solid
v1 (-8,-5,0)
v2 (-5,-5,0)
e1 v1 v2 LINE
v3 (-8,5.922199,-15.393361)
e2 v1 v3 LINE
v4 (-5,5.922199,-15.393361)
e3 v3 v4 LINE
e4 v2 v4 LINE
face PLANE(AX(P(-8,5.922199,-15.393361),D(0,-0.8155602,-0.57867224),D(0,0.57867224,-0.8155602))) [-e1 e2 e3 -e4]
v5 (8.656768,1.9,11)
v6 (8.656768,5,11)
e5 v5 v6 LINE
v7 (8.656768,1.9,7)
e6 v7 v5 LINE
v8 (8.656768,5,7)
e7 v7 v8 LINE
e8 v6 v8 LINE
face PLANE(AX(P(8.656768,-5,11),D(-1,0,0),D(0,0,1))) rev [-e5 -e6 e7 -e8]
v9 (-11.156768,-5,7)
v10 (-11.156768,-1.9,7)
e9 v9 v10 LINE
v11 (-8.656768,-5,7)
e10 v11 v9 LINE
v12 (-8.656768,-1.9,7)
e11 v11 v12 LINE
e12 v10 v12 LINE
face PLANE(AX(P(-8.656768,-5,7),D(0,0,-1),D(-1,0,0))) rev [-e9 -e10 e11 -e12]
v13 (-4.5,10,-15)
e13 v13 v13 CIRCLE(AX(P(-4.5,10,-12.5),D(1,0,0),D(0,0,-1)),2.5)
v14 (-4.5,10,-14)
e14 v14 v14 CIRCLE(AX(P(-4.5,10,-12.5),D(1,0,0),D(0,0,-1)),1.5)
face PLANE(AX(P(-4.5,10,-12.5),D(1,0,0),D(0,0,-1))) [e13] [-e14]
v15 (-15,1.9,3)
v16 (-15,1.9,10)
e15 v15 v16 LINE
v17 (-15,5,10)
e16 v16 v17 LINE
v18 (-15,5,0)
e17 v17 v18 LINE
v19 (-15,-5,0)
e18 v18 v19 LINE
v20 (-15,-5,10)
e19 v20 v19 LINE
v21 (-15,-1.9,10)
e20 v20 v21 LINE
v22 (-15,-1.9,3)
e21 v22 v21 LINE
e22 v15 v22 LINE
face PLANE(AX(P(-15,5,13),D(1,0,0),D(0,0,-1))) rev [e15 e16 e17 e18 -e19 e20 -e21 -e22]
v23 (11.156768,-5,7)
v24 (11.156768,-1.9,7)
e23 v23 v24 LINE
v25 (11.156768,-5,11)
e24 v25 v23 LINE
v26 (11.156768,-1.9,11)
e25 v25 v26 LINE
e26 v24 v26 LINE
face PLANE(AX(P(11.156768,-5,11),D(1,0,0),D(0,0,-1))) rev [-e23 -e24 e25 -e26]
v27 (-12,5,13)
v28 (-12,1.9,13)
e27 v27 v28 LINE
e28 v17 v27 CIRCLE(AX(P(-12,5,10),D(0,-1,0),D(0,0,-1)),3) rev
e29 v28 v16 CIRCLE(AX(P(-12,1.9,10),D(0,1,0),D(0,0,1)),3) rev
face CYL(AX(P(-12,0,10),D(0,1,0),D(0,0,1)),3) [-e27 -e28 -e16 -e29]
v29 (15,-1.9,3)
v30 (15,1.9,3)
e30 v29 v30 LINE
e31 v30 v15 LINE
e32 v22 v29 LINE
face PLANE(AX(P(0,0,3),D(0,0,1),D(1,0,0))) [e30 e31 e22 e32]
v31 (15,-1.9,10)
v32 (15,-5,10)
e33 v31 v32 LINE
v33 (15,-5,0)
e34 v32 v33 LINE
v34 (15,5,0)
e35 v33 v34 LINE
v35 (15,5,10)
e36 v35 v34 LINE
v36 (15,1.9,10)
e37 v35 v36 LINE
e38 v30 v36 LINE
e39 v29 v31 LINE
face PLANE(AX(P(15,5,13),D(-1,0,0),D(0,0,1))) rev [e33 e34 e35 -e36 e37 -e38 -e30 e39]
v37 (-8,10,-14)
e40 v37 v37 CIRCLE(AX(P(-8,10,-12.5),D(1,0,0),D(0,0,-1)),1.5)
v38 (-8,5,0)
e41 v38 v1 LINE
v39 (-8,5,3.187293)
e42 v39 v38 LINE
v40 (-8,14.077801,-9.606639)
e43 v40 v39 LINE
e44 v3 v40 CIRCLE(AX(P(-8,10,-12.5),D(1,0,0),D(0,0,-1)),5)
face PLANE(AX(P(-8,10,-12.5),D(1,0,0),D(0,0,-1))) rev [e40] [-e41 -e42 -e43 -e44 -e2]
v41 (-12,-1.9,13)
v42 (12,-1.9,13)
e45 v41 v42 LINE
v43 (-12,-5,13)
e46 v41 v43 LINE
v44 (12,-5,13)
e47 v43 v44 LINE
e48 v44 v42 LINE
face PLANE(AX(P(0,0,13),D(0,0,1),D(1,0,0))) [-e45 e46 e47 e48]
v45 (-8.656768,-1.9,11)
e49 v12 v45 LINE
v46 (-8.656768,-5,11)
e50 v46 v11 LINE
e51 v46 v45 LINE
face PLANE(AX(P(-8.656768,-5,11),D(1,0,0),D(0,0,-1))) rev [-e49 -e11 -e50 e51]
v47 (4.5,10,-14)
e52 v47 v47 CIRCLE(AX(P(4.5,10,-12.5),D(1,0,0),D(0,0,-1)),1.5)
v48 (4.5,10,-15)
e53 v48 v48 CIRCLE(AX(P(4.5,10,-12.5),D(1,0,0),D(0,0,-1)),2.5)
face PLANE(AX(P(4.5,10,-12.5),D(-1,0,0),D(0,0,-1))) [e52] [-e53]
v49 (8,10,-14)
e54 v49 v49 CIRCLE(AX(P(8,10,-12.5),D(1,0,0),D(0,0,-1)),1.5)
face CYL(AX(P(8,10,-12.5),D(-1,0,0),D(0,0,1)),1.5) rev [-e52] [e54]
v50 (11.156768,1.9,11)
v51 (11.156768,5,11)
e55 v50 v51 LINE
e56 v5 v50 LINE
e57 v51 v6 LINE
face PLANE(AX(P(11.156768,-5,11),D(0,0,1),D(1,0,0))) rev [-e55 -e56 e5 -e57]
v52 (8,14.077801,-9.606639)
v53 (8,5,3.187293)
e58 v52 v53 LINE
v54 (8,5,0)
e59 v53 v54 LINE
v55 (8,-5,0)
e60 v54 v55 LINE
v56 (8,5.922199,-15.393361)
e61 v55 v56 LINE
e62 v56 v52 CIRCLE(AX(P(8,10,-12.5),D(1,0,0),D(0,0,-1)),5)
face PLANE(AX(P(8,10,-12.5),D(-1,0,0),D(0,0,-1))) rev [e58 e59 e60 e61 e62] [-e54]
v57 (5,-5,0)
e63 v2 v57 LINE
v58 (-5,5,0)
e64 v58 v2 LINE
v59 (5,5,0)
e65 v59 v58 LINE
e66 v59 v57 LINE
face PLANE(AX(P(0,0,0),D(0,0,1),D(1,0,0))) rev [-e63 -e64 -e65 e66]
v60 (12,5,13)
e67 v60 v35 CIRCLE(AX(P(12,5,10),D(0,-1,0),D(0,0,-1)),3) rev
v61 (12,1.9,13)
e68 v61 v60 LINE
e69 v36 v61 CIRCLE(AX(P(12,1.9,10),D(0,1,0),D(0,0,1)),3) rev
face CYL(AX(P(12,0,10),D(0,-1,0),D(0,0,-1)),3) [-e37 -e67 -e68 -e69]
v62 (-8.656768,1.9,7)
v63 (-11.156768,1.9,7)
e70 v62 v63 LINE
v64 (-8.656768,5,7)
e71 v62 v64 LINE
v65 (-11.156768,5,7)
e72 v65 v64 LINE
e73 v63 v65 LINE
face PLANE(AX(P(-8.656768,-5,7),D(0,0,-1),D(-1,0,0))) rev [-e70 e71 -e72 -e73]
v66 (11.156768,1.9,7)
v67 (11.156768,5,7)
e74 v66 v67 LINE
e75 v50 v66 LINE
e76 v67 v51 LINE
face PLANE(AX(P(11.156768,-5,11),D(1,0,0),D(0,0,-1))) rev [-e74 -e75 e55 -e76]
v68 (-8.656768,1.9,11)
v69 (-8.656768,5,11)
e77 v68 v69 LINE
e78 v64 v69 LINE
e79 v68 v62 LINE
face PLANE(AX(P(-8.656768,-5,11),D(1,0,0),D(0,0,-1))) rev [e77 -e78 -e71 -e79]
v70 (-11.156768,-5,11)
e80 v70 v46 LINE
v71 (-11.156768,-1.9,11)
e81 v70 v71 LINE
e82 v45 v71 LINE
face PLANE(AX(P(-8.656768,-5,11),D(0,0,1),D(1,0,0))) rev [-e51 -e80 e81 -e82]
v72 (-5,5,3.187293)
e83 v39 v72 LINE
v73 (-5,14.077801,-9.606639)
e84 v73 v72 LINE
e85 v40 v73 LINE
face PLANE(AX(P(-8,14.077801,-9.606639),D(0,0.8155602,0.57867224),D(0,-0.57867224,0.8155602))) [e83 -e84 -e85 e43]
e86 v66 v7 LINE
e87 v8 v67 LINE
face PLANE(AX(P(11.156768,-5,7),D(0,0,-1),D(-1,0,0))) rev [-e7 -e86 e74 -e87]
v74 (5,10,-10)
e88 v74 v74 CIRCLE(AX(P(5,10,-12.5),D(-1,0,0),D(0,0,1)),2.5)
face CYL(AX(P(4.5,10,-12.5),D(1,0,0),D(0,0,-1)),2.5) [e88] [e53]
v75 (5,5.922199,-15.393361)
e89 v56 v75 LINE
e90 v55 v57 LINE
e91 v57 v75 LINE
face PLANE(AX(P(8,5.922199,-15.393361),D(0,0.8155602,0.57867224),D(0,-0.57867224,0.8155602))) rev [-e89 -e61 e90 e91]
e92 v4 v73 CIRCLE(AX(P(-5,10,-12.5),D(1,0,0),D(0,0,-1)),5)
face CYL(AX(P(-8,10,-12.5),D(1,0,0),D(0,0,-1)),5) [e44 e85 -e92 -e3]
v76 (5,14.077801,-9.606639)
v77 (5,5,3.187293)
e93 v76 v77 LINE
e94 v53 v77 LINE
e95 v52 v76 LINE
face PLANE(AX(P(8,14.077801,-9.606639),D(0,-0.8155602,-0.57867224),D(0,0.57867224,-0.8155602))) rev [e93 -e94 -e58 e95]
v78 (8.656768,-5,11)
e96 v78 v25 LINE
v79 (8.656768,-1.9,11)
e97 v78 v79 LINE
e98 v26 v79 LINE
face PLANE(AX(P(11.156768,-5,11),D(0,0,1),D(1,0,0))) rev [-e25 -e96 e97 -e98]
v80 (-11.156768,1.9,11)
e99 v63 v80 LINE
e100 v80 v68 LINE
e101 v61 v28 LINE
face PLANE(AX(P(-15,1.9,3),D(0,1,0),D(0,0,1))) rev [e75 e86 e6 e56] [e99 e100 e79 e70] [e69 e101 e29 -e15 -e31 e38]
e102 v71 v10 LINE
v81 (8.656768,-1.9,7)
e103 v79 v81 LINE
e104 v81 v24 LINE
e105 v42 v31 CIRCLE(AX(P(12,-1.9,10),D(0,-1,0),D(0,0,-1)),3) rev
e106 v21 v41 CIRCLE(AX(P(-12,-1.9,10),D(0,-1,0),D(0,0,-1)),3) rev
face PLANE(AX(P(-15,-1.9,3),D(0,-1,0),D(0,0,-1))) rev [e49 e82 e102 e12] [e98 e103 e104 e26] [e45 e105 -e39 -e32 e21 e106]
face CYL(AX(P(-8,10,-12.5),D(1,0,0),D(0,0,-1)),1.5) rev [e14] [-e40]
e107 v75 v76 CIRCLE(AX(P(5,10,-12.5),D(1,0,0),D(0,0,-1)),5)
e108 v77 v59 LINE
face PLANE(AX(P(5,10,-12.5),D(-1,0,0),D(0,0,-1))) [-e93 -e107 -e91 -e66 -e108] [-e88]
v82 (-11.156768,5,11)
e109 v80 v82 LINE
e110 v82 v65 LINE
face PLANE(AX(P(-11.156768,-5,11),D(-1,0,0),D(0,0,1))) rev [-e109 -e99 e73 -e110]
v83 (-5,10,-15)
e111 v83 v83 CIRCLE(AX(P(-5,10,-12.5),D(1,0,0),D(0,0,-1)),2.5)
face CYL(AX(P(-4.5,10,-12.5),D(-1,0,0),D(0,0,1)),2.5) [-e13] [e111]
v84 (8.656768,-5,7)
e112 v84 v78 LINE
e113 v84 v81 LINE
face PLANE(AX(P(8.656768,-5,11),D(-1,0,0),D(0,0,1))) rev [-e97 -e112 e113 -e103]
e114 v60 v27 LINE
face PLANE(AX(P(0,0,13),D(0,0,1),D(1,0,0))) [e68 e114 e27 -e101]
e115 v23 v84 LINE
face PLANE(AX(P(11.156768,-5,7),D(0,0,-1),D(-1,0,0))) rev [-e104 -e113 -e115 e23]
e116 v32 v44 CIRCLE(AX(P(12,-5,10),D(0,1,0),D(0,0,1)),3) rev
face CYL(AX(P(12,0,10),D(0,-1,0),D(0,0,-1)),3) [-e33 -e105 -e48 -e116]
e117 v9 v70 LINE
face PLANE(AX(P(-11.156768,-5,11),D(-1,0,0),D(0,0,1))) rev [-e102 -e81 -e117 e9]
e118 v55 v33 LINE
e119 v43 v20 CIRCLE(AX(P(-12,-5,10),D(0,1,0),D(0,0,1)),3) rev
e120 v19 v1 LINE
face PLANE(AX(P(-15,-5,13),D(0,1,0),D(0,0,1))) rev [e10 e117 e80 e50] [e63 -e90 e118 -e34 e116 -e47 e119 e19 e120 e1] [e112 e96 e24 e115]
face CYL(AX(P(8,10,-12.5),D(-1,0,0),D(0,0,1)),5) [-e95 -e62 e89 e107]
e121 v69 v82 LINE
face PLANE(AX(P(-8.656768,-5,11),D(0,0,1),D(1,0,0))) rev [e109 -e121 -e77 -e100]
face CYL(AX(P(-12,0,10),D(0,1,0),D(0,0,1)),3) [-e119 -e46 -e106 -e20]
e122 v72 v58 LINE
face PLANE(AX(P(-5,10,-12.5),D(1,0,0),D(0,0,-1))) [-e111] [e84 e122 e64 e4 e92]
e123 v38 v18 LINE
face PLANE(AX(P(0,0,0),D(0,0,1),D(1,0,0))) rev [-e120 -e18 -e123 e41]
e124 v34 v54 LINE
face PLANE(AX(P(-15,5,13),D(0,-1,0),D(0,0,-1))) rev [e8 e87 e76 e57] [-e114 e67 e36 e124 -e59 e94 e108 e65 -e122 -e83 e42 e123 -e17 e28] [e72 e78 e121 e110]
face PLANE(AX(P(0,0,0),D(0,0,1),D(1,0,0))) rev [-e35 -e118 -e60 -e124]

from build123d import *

# Parameters (mm, degrees)
ESBO_O1_W                  = 30
ESBO_O1_H                  = 10
RESSALTO_EXTRUS_O1_DEPTH   = 13
ESBO_O2_W                  = 30
ESBO_O2_H                  = 3.8
CORTE_EXTRUS_O1_DEPTH      = 10
FILETE1_R                  = 3
CORTE_EXTRUS_O2_DEPTH      = 23.226110771
CORTE_EXTRUS_O2_DEPTH_BACK = 23.226110771
ESBO_O3_W                  = 2.5
ESBO_O3_H                  = 4
ESBO_O4_W                  = 25
ESBO_O4_H                  = 25
RESSALTO_EXTRUS_O2_DEPTH   = 1.5
CHANFRO1_SIZE              = 5
CHANFRO1_SIZE_2            = 8.660254038
CHANFRO2_SIZE              = 7
CHANFRO2_SIZE2             = 4.041451884
ESBO_O5_R                  = 8.5
ESBO_O5_R_2                = 1
CORTE_EXTRUS_O3_DEPTH      = 3
FILETE2_R                  = 4
ESBO_O6_R                  = 1.5
RESSALTO_EXTRUS_O3_DEPTH   = 3
RESSALTO_EXTRUS_O4_START   = 0.5
ESBO_O7_R                  = 2.5
ESBO_O7_R_2                = 1.5
RESSALTO_EXTRUS_O4_DEPTH   = 0.5
CORTE_EXTRUS_O4_DEPTH      = 5


with BuildPart() as part:
    # Esboço1 → Ressalto-extrusão1 (new body)
    with BuildSketch(Plane.XY):
        Rectangle(ESBO_O1_W, ESBO_O1_H)
    extrude(amount=RESSALTO_EXTRUS_O1_DEPTH)

    # Esboço2 → Corte-extrusão1 (cut)
    with BuildSketch(Plane.XY.offset(13)):
        Rectangle(ESBO_O2_W, ESBO_O2_H)
    extrude(amount=-CORTE_EXTRUS_O1_DEPTH, mode=Mode.SUBTRACT)

    # Filete1
    filete1_edges = [part.edges().sort_by_distance(p)[0] for p in [
        (-15, 3.45, 13),
        (15, 3.45, 13),
        (-15, -3.45, 13),
        (15, -3.45, 13),
    ]]
    fillet(filete1_edges, radius=FILETE1_R)

    # Esboço3 → Corte-extrusão2 (cut, two sides: drawn at the far end of the back side and taken through both)
    with BuildSketch(Plane(origin=(0, 5, 0), x_dir=(1, 0, 0), z_dir=(0, 1, 0)).offset(-CORTE_EXTRUS_O2_DEPTH_BACK)):
        with Locations((9.906768391, -9)):
            Rectangle(ESBO_O3_W, ESBO_O3_H)
        with Locations((-9.906768391, -9)):
            Rectangle(ESBO_O3_W, ESBO_O3_H)
    extrude(amount=CORTE_EXTRUS_O2_DEPTH + CORTE_EXTRUS_O2_DEPTH_BACK, mode=Mode.SUBTRACT)

    # Esboço4 → Ressalto-extrusão2 (add, symmetric)
    with BuildSketch(Plane(origin=(13, 0, 0), x_dir=(0, 0, -1), z_dir=(1, 0, 0))):
        with Locations((12.5, 8.5)):
            Rectangle(ESBO_O4_W, ESBO_O4_H)
    extrude(amount=RESSALTO_EXTRUS_O2_DEPTH, both=True)

    # Chanfro1
    # the kernel refuses this chamfer: 8.660254038, 5 mm, written as the material it adds along each edge
    with BuildSketch(Plane(origin=(11.5, -4, 0), x_dir=(0, -0.9983227437537924, 0.05789386240267202), z_dir=(1, 0, 0))) as chanfro1_piece_1_section:
        Polygon((CHANFRO1_SIZE * 0.998322743754, CHANFRO1_SIZE * 0.0578938624027), (-CHANFRO1_SIZE_2 * 0.0578938624016, CHANFRO1_SIZE_2 * 0.998322743736), (0, 0), align=None)
    chanfro1_piece_1 = extrude(amount=3, mode=Mode.PRIVATE)
    chanfro1_piece_1 = split(chanfro1_piece_1, bisect_by=Plane(origin=(13, -5, -4.055902091), z_dir=(0, 1, 0)), keep=Keep.TOP, mode=Mode.PRIVATE)
    add(chanfro1_piece_1)

    # Chanfro2
    chanfro2_edges = [part.edges().sort_by_distance(p)[0] for p in [
        (13, 5, 0),
    ]]
    chanfro2_side = [part.faces().sort_by_distance(p)[0] for p in [
        (0, 5, 6.301932384),
    ]]
    chamfer(chanfro2_edges, length=CHANFRO2_SIZE, length2=CHANFRO2_SIZE2, reference=chanfro2_side[0])

    # Esboço5 → Corte-extrusão3 (cut)
    with BuildSketch(Plane.ZY.offset(-11.5)):
        with Locations((-12.5, 10)):
            Circle(ESBO_O5_R)
        with Locations((-20.2, 17.7)):
            Circle(ESBO_O5_R_2)
        with Locations((-4.8, 17.7)):
            Circle(ESBO_O5_R_2)
        with Locations((-4.8, 2.3)):
            Circle(ESBO_O5_R_2)
        with Locations((-20.2, 2.3)):
            Circle(ESBO_O5_R_2)
    extrude(amount=-CORTE_EXTRUS_O3_DEPTH, mode=Mode.SUBTRACT)

    # Filete2
    filete2_edges = [part.edges().sort_by_distance(p)[0] for p in [
        (13, 21, 0),
        (13, 21, -25),
        (13, -4, -25),
    ]]
    fillet(filete2_edges, radius=FILETE2_R)

    # Esboço6 → Ressalto-extrusão3 (add)
    with BuildSketch(Plane(origin=(-5, 0, 0), x_dir=(0, 0, -1), z_dir=(1, 0, 0))):
        with BuildLine():
            Line((9.606638802, 14.077800998), (-3.187293044, 5))
            Line((-3.187293044, 5), (0, 5))
            Line((0, 5), (0, -5))
            Line((0, -5), (15.393361198, 5.922199002))
            ThreePointArc((15.393361198, 5.922199002), (16.577800998, 12.893361198), (9.606638802, 14.077800998))
        make_face()
        with Locations((12.5, 10)):
            Circle(ESBO_O6_R, mode=Mode.SUBTRACT)
    ressalto_extrus_o3 = extrude(amount=-RESSALTO_EXTRUS_O3_DEPTH)

    # Esboço7 → Ressalto-extrusão4 (add)
    with BuildSketch(Plane(origin=(-5, 0, 0), x_dir=(0, 0, -1), z_dir=(1, 0, 0)).offset(RESSALTO_EXTRUS_O4_START)):
        with Locations((12.5, 10)):
            Circle(ESBO_O7_R)
        with Locations((12.5, 10)):
            Circle(ESBO_O7_R_2, mode=Mode.SUBTRACT)
    ressalto_extrus_o4 = extrude(amount=-RESSALTO_EXTRUS_O4_DEPTH)

    # Espelhar1: Ressalto-extrusão3, Ressalto-extrusão4 across plane
    add(ressalto_extrus_o3.mirror(Plane(origin=(0, 0, 0), x_dir=(0, 0, 1), z_dir=(1, 0, 0))))
    add(ressalto_extrus_o4.mirror(Plane(origin=(0, 0, 0), x_dir=(0, 0, 1), z_dir=(1, 0, 0))))

    # Esboço8 → Corte-extrusão4 (cut)
    with BuildSketch(Plane(origin=(15, 0, 0), x_dir=(0, 0, -1), z_dir=(1, 0, 0))):
        Polygon((-7.894114033, 22.521884482), (29.173309196, 22.521884482), (29.173309196, 5), (29.173309196, -5), (0, -5), (0, 5), (-7.894114033, 5), align=None)
    extrude(amount=-CORTE_EXTRUS_O4_DEPTH, mode=Mode.SUBTRACT)


solid = part.part
